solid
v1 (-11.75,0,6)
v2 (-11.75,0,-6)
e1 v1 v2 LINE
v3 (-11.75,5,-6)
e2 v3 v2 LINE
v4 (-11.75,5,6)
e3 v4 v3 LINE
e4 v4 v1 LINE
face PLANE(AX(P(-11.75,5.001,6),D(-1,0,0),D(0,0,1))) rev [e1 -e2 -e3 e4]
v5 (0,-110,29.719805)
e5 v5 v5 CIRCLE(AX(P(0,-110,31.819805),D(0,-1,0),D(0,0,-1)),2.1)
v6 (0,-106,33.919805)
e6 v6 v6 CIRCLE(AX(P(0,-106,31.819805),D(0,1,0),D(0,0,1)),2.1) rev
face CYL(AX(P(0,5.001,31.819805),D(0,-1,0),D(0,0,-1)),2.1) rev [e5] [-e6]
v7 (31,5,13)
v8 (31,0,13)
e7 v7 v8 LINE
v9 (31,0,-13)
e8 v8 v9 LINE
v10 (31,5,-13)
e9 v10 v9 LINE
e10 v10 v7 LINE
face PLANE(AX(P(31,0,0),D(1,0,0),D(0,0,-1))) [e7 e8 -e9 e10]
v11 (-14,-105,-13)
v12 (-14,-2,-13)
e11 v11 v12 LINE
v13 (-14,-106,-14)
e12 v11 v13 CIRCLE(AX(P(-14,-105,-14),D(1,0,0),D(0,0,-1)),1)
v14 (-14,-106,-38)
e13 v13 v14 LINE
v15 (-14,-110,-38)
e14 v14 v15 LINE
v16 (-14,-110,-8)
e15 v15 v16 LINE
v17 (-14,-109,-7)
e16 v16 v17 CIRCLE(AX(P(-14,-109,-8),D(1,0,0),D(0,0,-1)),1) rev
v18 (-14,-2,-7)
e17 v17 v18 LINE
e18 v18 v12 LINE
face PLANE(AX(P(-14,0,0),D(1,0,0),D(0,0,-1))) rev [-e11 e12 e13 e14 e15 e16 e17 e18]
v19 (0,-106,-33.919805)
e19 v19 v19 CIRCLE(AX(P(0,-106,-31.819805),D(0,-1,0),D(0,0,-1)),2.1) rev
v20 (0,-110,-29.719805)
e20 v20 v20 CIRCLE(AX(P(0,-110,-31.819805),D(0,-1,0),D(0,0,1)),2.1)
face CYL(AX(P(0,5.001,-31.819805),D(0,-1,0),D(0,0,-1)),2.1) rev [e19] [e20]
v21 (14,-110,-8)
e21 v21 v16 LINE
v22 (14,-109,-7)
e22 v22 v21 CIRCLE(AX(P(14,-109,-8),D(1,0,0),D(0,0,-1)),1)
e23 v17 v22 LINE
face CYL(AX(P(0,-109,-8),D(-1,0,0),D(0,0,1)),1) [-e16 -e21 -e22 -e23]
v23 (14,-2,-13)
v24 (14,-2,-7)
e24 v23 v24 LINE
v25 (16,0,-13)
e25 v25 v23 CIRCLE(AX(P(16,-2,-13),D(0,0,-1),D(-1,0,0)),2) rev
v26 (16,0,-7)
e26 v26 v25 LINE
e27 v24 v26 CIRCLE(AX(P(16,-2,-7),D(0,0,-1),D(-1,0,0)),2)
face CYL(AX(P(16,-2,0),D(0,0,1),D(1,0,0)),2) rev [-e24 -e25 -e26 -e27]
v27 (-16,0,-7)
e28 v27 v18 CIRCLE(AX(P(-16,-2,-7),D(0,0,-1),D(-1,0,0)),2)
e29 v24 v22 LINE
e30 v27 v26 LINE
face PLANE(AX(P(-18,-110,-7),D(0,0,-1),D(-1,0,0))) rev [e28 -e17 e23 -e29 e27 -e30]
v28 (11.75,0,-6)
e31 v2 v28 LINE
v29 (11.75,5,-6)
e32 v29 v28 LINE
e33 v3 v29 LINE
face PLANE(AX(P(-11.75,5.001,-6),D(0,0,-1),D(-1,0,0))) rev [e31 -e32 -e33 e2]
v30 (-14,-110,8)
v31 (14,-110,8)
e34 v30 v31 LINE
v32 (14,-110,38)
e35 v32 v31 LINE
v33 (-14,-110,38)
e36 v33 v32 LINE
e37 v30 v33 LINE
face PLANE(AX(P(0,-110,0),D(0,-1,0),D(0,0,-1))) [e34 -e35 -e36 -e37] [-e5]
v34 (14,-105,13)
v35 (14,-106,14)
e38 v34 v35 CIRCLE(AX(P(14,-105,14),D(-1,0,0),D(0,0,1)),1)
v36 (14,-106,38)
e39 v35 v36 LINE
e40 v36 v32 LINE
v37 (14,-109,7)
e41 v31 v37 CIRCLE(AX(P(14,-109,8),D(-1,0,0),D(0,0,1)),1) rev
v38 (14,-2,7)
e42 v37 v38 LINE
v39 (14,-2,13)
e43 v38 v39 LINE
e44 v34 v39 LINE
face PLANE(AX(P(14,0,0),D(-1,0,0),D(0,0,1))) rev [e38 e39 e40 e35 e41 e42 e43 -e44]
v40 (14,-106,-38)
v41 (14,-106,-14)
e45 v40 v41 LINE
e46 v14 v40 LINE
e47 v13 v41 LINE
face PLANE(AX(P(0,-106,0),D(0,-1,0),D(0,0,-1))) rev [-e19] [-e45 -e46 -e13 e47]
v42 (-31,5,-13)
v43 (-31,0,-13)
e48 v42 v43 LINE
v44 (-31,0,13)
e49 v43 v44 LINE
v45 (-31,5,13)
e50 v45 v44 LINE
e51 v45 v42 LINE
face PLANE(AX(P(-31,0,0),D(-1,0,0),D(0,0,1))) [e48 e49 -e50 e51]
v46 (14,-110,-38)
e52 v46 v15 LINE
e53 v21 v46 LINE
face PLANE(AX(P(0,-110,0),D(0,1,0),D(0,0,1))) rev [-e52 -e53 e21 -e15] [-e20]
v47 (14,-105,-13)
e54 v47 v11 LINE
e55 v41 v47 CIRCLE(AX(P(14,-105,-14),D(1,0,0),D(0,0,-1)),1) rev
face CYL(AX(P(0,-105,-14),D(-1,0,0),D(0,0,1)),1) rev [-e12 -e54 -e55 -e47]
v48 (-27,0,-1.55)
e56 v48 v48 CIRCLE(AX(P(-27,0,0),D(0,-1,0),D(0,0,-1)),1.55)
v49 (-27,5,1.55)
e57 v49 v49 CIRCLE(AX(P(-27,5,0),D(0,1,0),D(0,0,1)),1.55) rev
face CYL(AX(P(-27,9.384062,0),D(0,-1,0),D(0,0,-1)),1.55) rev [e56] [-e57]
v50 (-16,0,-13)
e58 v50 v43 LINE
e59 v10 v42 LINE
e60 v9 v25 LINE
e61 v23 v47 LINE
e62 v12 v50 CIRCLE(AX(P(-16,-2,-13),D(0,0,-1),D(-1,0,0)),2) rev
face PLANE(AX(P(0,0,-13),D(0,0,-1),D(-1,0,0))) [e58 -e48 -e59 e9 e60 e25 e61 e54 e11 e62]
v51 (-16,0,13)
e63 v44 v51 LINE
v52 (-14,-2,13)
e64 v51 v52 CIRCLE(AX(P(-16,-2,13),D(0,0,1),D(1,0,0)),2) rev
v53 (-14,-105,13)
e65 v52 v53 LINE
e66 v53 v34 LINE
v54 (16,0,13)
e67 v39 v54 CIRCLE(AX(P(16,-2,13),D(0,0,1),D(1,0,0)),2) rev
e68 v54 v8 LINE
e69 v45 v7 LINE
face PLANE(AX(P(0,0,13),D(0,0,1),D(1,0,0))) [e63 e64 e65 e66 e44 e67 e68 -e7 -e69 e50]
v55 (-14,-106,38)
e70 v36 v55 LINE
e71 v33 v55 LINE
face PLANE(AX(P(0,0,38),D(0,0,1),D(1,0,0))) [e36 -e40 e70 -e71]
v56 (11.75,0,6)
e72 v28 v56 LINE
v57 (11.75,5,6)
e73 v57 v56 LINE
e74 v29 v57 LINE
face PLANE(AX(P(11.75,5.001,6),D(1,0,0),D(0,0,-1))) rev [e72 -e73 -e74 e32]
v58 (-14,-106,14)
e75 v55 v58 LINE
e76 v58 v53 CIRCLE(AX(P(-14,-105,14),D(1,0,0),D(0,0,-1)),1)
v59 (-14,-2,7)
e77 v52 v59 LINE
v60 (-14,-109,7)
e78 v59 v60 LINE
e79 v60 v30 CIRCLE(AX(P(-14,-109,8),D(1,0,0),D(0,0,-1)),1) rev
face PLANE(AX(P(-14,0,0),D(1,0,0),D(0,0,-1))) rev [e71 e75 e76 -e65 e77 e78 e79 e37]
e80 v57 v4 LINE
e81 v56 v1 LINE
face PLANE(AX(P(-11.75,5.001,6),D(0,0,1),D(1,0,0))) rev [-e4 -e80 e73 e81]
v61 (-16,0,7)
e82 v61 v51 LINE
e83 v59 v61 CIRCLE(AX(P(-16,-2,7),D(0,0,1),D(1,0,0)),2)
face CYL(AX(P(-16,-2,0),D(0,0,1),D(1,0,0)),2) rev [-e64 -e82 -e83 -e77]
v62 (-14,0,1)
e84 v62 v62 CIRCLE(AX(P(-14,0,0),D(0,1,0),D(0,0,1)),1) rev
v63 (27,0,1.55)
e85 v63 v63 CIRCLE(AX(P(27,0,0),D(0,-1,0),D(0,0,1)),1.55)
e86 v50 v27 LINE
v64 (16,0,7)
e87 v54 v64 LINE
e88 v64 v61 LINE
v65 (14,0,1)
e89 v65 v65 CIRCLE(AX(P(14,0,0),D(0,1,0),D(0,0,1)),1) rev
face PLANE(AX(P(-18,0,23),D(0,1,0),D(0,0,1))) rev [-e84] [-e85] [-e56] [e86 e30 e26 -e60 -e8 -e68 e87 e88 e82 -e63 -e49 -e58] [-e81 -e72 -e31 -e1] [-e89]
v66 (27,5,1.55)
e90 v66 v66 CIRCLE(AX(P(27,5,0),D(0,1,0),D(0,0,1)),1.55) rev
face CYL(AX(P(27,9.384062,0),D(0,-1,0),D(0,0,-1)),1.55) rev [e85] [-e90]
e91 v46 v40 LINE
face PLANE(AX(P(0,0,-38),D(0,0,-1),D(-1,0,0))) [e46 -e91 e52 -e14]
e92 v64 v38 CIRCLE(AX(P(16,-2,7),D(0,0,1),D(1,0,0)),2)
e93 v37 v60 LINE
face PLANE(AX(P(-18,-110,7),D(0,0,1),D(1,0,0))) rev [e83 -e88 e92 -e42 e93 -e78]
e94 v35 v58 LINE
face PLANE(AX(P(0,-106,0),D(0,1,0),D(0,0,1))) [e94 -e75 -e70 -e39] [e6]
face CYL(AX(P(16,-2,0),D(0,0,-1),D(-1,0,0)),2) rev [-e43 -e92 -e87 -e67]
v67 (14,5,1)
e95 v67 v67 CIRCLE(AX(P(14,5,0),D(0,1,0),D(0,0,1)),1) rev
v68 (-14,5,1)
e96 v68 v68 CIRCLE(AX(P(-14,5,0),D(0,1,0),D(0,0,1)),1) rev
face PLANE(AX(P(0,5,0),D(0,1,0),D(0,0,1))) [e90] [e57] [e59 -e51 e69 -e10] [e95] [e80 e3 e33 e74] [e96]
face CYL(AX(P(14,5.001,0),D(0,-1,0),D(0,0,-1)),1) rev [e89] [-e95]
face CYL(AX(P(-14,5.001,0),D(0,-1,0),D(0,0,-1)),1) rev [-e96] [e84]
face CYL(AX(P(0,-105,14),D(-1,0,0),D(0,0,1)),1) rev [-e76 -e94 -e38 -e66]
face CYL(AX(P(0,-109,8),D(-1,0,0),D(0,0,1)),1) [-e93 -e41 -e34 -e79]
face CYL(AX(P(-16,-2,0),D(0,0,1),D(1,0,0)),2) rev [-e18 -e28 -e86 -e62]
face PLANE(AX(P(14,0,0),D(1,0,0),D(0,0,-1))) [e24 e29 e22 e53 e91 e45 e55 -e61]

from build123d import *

# Parameters (mm, degrees)
SKETCH_1_W               = 36
SKETCH_1_H               = 30
EXTRUDE_1_DEPTH          = 5
SKETCH_11_W              = 36
SKETCH_11_H              = 8
EXTRUDE_3_DEPTH          = 110
SKETCH_12_W              = 36
SKETCH_12_H              = 8
EXTRUDE_4_DEPTH          = 4
SKETCH_17_W              = 36
SKETCH_17_H              = 5
EXTRUDE_5_DEPTH          = 8
SKETCH_18_W              = 36
SKETCH_18_H              = 5
EXTRUDE_6_DEPTH          = 8
SKETCH_20_W              = 36
SKETCH_20_H              = 4
EXTRUDE_7_DEPTH          = 15
SKETCH_21_W              = 36
SKETCH_21_H              = 4
EXTRUDE_8_DEPTH          = 15
CUT_EXTRUDE_8_REACH      = 124.446
SKETCH_22_R              = 2.1
CUT_EXTRUDE_9_REACH      = 124.446
SKETCH_23_R              = 1.55
CUT_EXTRUDE_10_REACH     = 119.762
SKETCH_26_R              = 1
SKETCH_26_W              = 23.5
SKETCH_26_H              = 12
CUT_EXTRUDE_11_DEPTH     = 2
CUT_EXTRUDE_12_DEPTH     = 2
CUT_EXTRUDE_13_DEPTH     = 2
CUT_EXTRUDE_14_DEPTH     = 2
SKETCH_32_W              = 28
SKETCH_32_H              = 106
CUT_EXTRUDE_15_DEPTH     = 2
SKETCH_33_W              = 28
SKETCH_33_H              = 106
CUT_EXTRUDE_16_DEPTH     = 2
FILLET_2_R               = 1
EXTRUDE_START            = 2
SKETCH_34_W              = 32
SKETCH_34_H              = 14.000594261
SKETCH_34_R              = 1
SKETCH_34_W_2            = 23.5
SKETCH_34_H_2            = 12
EXTRUDE_12_DEPTH         = 2
CUT_EXTRUDE_START        = -2
CUT_EXTRUDE_17_OUTLINE_R = 1
CUT_EXTRUDE_17_OUTLINE_W = 23.5
CUT_EXTRUDE_17_OUTLINE_H = 12
CUT_EXTRUDE_17_DEPTH     = 2
SKETCH_36_W              = 46
SKETCH_36_H              = 5
EXTRUDE_13_DEPTH         = 15
SKETCH_37_W              = 46
SKETCH_37_H              = 5
EXTRUDE_14_DEPTH         = 15
SKETCH_38_R              = 1.55
CUT_EXTRUDE_18_DEPTH     = 5
CUT_EXTRUDE_19_REACH     = 122.437
SKETCH_39_W              = 62
SKETCH_39_H              = 10
FILLET_3_R               = 2


# Read off the part's stored shape, not the designer's step: 切除-拉伸17
with BuildPart() as part:
    # 草图1 → 凸台-拉伸1 (new body)
    with BuildSketch(Plane(origin=(0, 0, 0), x_dir=(1, 0, 0), z_dir=(0, 1, 0))):
        Rectangle(SKETCH_1_W, SKETCH_1_H)
    extrude(amount=EXTRUDE_1_DEPTH)

    # 草图11 → 凸台-拉伸3 (add)
    with BuildSketch(Plane.XZ):
        with Locations((0, 11)):
            Rectangle(SKETCH_11_W, SKETCH_11_H)
        with Locations((0, -11)):
            Rectangle(SKETCH_11_W, SKETCH_11_H)
    extrude(amount=EXTRUDE_3_DEPTH)

    # 草图12 → 凸台-拉伸4 (add)
    with BuildSketch(Plane.XZ.offset(110)):
        with Locations((0, 19)):
            Rectangle(SKETCH_12_W, SKETCH_12_H)
        with Locations((0, -19)):
            Rectangle(SKETCH_12_W, SKETCH_12_H)
    extrude(amount=-EXTRUDE_4_DEPTH)

    # 草图17 → 凸台-拉伸5 (add)
    with BuildSketch(Plane(origin=(0, 0, -15), x_dir=(-1, 0, 0), z_dir=(0, 0, -1))):
        with Locations((0, 2.5)):
            Rectangle(SKETCH_17_W, SKETCH_17_H)
    extrude(amount=EXTRUDE_5_DEPTH)

    # 草图18 → 凸台-拉伸6 (add)
    with BuildSketch(Plane.XY.offset(15)):
        with Locations((0, 2.5)):
            Rectangle(SKETCH_18_W, SKETCH_18_H)
    extrude(amount=EXTRUDE_6_DEPTH)

    # 草图20 → 凸台-拉伸7 (add)
    with BuildSketch(Plane.XY.offset(23)):
        with Locations((0, -108)):
            Rectangle(SKETCH_20_W, SKETCH_20_H)
    extrude(amount=EXTRUDE_7_DEPTH)

    # 草图21 → 凸台-拉伸8 (add)
    with BuildSketch(Plane(origin=(0, 0, -23), x_dir=(-1, 0, 0), z_dir=(0, 0, -1))):
        with Locations((0, -108)):
            Rectangle(SKETCH_21_W, SKETCH_21_H)
    extrude(amount=EXTRUDE_8_DEPTH)

    # 草图22 → 切除-拉伸8 (cut, up to next)
    with BuildSketch(Plane.XZ.offset(110), mode=Mode.PRIVATE) as cut_extrude_8_sk1:
        with Locations(Location((0, 31.819805155, 0), (0, 0, 270))):
            Circle(SKETCH_22_R)
    cut_extrude_8_tool1 = extrude(cut_extrude_8_sk1.sketch, amount=-CUT_EXTRUDE_8_REACH, mode=Mode.PRIVATE) & part.part
    # 草图22 → 切除-拉伸8 (cut, up to next)
    with BuildSketch(Plane.XZ.offset(110), mode=Mode.PRIVATE) as cut_extrude_8_sk2:
        with Locations(Location((0, -31.819805155, 0), (0, 0, 270))):
            Circle(SKETCH_22_R)
    cut_extrude_8_tool2 = extrude(cut_extrude_8_sk2.sketch, amount=-CUT_EXTRUDE_8_REACH, mode=Mode.PRIVATE) & part.part
    add(cut_extrude_8_tool1.solids().sort_by_distance((0, -110, 31.819805))[0], mode=Mode.SUBTRACT)
    add(cut_extrude_8_tool2.solids().sort_by_distance((0, -110, -31.819805))[0], mode=Mode.SUBTRACT)

    # 草图23 → 切除-拉伸9 (cut, up to next)
    with BuildSketch(Plane(origin=(0, 5, 0), x_dir=(1, 0, 0), z_dir=(0, 1, 0)), mode=Mode.PRIVATE) as cut_extrude_9_sk1:
        with Locations(Location((0, 18, 0), (0, 0, 270))):
            Circle(SKETCH_23_R)
    cut_extrude_9_tool1 = extrude(cut_extrude_9_sk1.sketch, amount=-CUT_EXTRUDE_9_REACH, mode=Mode.PRIVATE) & part.part
    # 草图23 → 切除-拉伸9 (cut, up to next)
    with BuildSketch(Plane(origin=(0, 5, 0), x_dir=(1, 0, 0), z_dir=(0, 1, 0)), mode=Mode.PRIVATE) as cut_extrude_9_sk2:
        with Locations(Location((0, -18, 0), (0, 0, 270))):
            Circle(SKETCH_23_R)
    cut_extrude_9_tool2 = extrude(cut_extrude_9_sk2.sketch, amount=-CUT_EXTRUDE_9_REACH, mode=Mode.PRIVATE) & part.part
    add(cut_extrude_9_tool1.solids().sort_by_distance((0, 5, -18))[0], mode=Mode.SUBTRACT)
    add(cut_extrude_9_tool2.solids().sort_by_distance((0, 5, 18))[0], mode=Mode.SUBTRACT)

    # 草图26 → 切除-拉伸10 (cut, up to next)
    with BuildSketch(Plane(origin=(0, 0, 0), x_dir=(-1, 0, 0), z_dir=(0, -1, 0)), mode=Mode.PRIVATE) as cut_extrude_10_sk1:
        with Locations(Location((-14, 0, 0), (0, 0, 90))):
            Circle(SKETCH_26_R)
    cut_extrude_10_tool1 = extrude(cut_extrude_10_sk1.sketch, amount=-CUT_EXTRUDE_10_REACH, mode=Mode.PRIVATE) & part.part
    # 草图26 → 切除-拉伸10 (cut, up to next)
    with BuildSketch(Plane(origin=(0, 0, 0), x_dir=(-1, 0, 0), z_dir=(0, -1, 0)), mode=Mode.PRIVATE) as cut_extrude_10_sk2:
        with Locations(Location((14, 0, 0), (0, 0, 270))):
            Circle(SKETCH_26_R)
    cut_extrude_10_tool2 = extrude(cut_extrude_10_sk2.sketch, amount=-CUT_EXTRUDE_10_REACH, mode=Mode.PRIVATE) & part.part
    # 草图26 → 切除-拉伸10 (cut, up to next)
    with BuildSketch(Plane(origin=(0, 0, 0), x_dir=(-1, 0, 0), z_dir=(0, -1, 0)), mode=Mode.PRIVATE) as cut_extrude_10_sk3:
        Rectangle(SKETCH_26_W, SKETCH_26_H)
    cut_extrude_10_tool3 = extrude(cut_extrude_10_sk3.sketch, amount=-CUT_EXTRUDE_10_REACH, mode=Mode.PRIVATE) & part.part
    add(cut_extrude_10_tool1.solids().sort_by_distance((14, 0, 0))[0], mode=Mode.SUBTRACT)
    add(cut_extrude_10_tool2.solids().sort_by_distance((-14, 0, 0))[0], mode=Mode.SUBTRACT)
    add(cut_extrude_10_tool3.solids().sort_by_distance((0, 0, 0))[0], mode=Mode.SUBTRACT)

    # 草图28 → 切除-拉伸11 (cut)
    with BuildSketch(Plane(origin=(18, 0, 0), x_dir=(0, 0, -1), z_dir=(1, 0, 0))):
        Polygon((23, 5), (-23, 5), (-23, 0), (-15, 0), (-15, -106), (-38, -106), (-38, -110), (-7, -110), (-7, 0), (7, 0), (7, -110), (38, -110), (38, -106), (15, -106), (15, 0), (23, 0), align=None)
    extrude(amount=-CUT_EXTRUDE_11_DEPTH, mode=Mode.SUBTRACT)

    # 草图29 → 切除-拉伸12 (cut)
    with BuildSketch(Plane.ZY.offset(18)):
        Polygon((23, 5), (-23, 5), (-23, 0), (-15, 0), (-15, -106), (-38, -106), (-38, -110), (-7, -110), (-7, 0), (7, 0), (7, -110), (38, -110), (38, -106), (15, -106), (15, 0), (23, 0), align=None)
    extrude(amount=-CUT_EXTRUDE_12_DEPTH, mode=Mode.SUBTRACT)

    # 草图30 → 切除-拉伸13 (cut)
    with BuildSketch(Plane(origin=(16, 0, 0), x_dir=(0, 0, -1), z_dir=(1, 0, 0))):
        Polygon((-15, 0), (-7, 0), (-7, -110), (-38, -110), (-38, -106), (-15, -106), align=None)
        Polygon((7, 0), (15, 0), (15, -106), (38, -106), (38, -110), (7, -110), align=None)
    extrude(amount=-CUT_EXTRUDE_13_DEPTH, mode=Mode.SUBTRACT)

    # 草图31 → 切除-拉伸14 (cut)
    with BuildSketch(Plane.ZY.offset(16)):
        Polygon((-7, 0), (-7, -110), (-38, -110), (-38, -106), (-15, -106), (-15, 0), align=None)
        Polygon((15, 0), (15, -106), (38, -106), (38, -110), (7, -110), (7, 0), align=None)
    extrude(amount=-CUT_EXTRUDE_14_DEPTH, mode=Mode.SUBTRACT)

    # 草图32 → 切除-拉伸15 (cut)
    with BuildSketch(Plane.XY.offset(15)):
        with Locations((0, -53)):
            Rectangle(SKETCH_32_W, SKETCH_32_H)
    extrude(amount=-CUT_EXTRUDE_15_DEPTH, mode=Mode.SUBTRACT)

    # 草图33 → 切除-拉伸16 (cut)
    with BuildSketch(Plane(origin=(0, 0, -15), x_dir=(-1, 0, 0), z_dir=(0, 0, -1))):
        with Locations((0, -53)):
            Rectangle(SKETCH_33_W, SKETCH_33_H)
    extrude(amount=-CUT_EXTRUDE_16_DEPTH, mode=Mode.SUBTRACT)

    # 圆角2
    fillet_2_edges = [part.edges().sort_by_distance(p)[0] for p in [
        (0, -110, -7),
        (0, -110, 7),
        (0, -106, 13),
        (0, -106, -13),
    ]]
    fillet(fillet_2_edges, radius=FILLET_2_R)

    # 草图34 → 凸台-拉伸12 (add)
    with BuildSketch(Plane.XZ.offset(EXTRUDE_START)):
        with Locations((0, 0.000297131)):
            Rectangle(SKETCH_34_W, SKETCH_34_H)
        with Locations(Location((14, 0, 0), (0, 0, 270))):
            Circle(SKETCH_34_R, mode=Mode.SUBTRACT)
        with Locations(Location((-14, 0, 0), (0, 0, 270))):
            Circle(SKETCH_34_R, mode=Mode.SUBTRACT)
        Rectangle(SKETCH_34_W_2, SKETCH_34_H_2, mode=Mode.SUBTRACT)
    extrude(amount=-EXTRUDE_12_DEPTH)

    # 切除-拉伸17 outline → 切除-拉伸17 (cut)
    with BuildSketch(Plane.XZ.offset(2).offset(CUT_EXTRUDE_START)):
        Polygon((-16, -7), (16, -7), (16, 7.000594261), (14, 7.000594261), (14, 7), (-14, 7), (-14, 7.000594261), (-16, 7.000594261), align=None)
        with Locations((-14, 0)):
            Circle(CUT_EXTRUDE_17_OUTLINE_R, mode=Mode.SUBTRACT)
        Rectangle(CUT_EXTRUDE_17_OUTLINE_W, CUT_EXTRUDE_17_OUTLINE_H, mode=Mode.SUBTRACT)
        with Locations((14, 0)):
            Circle(CUT_EXTRUDE_17_OUTLINE_R, mode=Mode.SUBTRACT)
    extrude(amount=CUT_EXTRUDE_17_DEPTH, mode=Mode.SUBTRACT)

    # 草图36 → 凸台-拉伸13 (add)
    with BuildSketch(Plane.ZY.offset(16)):
        with Locations((0, 2.5)):
            Rectangle(SKETCH_36_W, SKETCH_36_H)
    extrude(amount=EXTRUDE_13_DEPTH)

    # 草图37 → 凸台-拉伸14 (add)
    with BuildSketch(Plane(origin=(16, 0, 0), x_dir=(0, 0, -1), z_dir=(1, 0, 0))):
        with Locations((0, 2.5)):
            Rectangle(SKETCH_37_W, SKETCH_37_H)
    extrude(amount=EXTRUDE_14_DEPTH)

    # 草图38 → 切除-拉伸18 (cut)
    with BuildSketch(Plane.XZ):
        with Locations(Location((-27, 0, 0), (0, 0, 270))):
            Circle(SKETCH_38_R)
        with Locations(Location((27, 0, 0), (0, 0, 90))):
            Circle(SKETCH_38_R)
    extrude(amount=-CUT_EXTRUDE_18_DEPTH, mode=Mode.SUBTRACT)

    # 草图39 → 切除-拉伸19 (cut, up to next)
    with BuildSketch(Plane.XZ, mode=Mode.PRIVATE) as cut_extrude_19_sk1:
        with Locations((0, 18)):
            Rectangle(SKETCH_39_W, SKETCH_39_H)
    cut_extrude_19_tool1 = extrude(cut_extrude_19_sk1.sketch, amount=-CUT_EXTRUDE_19_REACH, mode=Mode.PRIVATE) & part.part
    # 草图39 → 切除-拉伸19 (cut, up to next)
    with BuildSketch(Plane.XZ, mode=Mode.PRIVATE) as cut_extrude_19_sk2:
        with Locations((0, -18)):
            Rectangle(SKETCH_39_W, SKETCH_39_H)
    cut_extrude_19_tool2 = extrude(cut_extrude_19_sk2.sketch, amount=-CUT_EXTRUDE_19_REACH, mode=Mode.PRIVATE) & part.part
    add(cut_extrude_19_tool1.solids().sort_by_distance((0, 0, 18))[0], mode=Mode.SUBTRACT)
    add(cut_extrude_19_tool2.solids().sort_by_distance((0, 0, -18))[0], mode=Mode.SUBTRACT)

    # 圆角3
    fillet_3_edges = [part.edges().sort_by_distance(p)[0] for p in [
        (-14, 0, -10),
        (-14, 0, 10),
        (14, 0, -10),
        (14, 0, 10),
    ]]
    fillet(fillet_3_edges, radius=FILLET_3_R)


solid = part.part
